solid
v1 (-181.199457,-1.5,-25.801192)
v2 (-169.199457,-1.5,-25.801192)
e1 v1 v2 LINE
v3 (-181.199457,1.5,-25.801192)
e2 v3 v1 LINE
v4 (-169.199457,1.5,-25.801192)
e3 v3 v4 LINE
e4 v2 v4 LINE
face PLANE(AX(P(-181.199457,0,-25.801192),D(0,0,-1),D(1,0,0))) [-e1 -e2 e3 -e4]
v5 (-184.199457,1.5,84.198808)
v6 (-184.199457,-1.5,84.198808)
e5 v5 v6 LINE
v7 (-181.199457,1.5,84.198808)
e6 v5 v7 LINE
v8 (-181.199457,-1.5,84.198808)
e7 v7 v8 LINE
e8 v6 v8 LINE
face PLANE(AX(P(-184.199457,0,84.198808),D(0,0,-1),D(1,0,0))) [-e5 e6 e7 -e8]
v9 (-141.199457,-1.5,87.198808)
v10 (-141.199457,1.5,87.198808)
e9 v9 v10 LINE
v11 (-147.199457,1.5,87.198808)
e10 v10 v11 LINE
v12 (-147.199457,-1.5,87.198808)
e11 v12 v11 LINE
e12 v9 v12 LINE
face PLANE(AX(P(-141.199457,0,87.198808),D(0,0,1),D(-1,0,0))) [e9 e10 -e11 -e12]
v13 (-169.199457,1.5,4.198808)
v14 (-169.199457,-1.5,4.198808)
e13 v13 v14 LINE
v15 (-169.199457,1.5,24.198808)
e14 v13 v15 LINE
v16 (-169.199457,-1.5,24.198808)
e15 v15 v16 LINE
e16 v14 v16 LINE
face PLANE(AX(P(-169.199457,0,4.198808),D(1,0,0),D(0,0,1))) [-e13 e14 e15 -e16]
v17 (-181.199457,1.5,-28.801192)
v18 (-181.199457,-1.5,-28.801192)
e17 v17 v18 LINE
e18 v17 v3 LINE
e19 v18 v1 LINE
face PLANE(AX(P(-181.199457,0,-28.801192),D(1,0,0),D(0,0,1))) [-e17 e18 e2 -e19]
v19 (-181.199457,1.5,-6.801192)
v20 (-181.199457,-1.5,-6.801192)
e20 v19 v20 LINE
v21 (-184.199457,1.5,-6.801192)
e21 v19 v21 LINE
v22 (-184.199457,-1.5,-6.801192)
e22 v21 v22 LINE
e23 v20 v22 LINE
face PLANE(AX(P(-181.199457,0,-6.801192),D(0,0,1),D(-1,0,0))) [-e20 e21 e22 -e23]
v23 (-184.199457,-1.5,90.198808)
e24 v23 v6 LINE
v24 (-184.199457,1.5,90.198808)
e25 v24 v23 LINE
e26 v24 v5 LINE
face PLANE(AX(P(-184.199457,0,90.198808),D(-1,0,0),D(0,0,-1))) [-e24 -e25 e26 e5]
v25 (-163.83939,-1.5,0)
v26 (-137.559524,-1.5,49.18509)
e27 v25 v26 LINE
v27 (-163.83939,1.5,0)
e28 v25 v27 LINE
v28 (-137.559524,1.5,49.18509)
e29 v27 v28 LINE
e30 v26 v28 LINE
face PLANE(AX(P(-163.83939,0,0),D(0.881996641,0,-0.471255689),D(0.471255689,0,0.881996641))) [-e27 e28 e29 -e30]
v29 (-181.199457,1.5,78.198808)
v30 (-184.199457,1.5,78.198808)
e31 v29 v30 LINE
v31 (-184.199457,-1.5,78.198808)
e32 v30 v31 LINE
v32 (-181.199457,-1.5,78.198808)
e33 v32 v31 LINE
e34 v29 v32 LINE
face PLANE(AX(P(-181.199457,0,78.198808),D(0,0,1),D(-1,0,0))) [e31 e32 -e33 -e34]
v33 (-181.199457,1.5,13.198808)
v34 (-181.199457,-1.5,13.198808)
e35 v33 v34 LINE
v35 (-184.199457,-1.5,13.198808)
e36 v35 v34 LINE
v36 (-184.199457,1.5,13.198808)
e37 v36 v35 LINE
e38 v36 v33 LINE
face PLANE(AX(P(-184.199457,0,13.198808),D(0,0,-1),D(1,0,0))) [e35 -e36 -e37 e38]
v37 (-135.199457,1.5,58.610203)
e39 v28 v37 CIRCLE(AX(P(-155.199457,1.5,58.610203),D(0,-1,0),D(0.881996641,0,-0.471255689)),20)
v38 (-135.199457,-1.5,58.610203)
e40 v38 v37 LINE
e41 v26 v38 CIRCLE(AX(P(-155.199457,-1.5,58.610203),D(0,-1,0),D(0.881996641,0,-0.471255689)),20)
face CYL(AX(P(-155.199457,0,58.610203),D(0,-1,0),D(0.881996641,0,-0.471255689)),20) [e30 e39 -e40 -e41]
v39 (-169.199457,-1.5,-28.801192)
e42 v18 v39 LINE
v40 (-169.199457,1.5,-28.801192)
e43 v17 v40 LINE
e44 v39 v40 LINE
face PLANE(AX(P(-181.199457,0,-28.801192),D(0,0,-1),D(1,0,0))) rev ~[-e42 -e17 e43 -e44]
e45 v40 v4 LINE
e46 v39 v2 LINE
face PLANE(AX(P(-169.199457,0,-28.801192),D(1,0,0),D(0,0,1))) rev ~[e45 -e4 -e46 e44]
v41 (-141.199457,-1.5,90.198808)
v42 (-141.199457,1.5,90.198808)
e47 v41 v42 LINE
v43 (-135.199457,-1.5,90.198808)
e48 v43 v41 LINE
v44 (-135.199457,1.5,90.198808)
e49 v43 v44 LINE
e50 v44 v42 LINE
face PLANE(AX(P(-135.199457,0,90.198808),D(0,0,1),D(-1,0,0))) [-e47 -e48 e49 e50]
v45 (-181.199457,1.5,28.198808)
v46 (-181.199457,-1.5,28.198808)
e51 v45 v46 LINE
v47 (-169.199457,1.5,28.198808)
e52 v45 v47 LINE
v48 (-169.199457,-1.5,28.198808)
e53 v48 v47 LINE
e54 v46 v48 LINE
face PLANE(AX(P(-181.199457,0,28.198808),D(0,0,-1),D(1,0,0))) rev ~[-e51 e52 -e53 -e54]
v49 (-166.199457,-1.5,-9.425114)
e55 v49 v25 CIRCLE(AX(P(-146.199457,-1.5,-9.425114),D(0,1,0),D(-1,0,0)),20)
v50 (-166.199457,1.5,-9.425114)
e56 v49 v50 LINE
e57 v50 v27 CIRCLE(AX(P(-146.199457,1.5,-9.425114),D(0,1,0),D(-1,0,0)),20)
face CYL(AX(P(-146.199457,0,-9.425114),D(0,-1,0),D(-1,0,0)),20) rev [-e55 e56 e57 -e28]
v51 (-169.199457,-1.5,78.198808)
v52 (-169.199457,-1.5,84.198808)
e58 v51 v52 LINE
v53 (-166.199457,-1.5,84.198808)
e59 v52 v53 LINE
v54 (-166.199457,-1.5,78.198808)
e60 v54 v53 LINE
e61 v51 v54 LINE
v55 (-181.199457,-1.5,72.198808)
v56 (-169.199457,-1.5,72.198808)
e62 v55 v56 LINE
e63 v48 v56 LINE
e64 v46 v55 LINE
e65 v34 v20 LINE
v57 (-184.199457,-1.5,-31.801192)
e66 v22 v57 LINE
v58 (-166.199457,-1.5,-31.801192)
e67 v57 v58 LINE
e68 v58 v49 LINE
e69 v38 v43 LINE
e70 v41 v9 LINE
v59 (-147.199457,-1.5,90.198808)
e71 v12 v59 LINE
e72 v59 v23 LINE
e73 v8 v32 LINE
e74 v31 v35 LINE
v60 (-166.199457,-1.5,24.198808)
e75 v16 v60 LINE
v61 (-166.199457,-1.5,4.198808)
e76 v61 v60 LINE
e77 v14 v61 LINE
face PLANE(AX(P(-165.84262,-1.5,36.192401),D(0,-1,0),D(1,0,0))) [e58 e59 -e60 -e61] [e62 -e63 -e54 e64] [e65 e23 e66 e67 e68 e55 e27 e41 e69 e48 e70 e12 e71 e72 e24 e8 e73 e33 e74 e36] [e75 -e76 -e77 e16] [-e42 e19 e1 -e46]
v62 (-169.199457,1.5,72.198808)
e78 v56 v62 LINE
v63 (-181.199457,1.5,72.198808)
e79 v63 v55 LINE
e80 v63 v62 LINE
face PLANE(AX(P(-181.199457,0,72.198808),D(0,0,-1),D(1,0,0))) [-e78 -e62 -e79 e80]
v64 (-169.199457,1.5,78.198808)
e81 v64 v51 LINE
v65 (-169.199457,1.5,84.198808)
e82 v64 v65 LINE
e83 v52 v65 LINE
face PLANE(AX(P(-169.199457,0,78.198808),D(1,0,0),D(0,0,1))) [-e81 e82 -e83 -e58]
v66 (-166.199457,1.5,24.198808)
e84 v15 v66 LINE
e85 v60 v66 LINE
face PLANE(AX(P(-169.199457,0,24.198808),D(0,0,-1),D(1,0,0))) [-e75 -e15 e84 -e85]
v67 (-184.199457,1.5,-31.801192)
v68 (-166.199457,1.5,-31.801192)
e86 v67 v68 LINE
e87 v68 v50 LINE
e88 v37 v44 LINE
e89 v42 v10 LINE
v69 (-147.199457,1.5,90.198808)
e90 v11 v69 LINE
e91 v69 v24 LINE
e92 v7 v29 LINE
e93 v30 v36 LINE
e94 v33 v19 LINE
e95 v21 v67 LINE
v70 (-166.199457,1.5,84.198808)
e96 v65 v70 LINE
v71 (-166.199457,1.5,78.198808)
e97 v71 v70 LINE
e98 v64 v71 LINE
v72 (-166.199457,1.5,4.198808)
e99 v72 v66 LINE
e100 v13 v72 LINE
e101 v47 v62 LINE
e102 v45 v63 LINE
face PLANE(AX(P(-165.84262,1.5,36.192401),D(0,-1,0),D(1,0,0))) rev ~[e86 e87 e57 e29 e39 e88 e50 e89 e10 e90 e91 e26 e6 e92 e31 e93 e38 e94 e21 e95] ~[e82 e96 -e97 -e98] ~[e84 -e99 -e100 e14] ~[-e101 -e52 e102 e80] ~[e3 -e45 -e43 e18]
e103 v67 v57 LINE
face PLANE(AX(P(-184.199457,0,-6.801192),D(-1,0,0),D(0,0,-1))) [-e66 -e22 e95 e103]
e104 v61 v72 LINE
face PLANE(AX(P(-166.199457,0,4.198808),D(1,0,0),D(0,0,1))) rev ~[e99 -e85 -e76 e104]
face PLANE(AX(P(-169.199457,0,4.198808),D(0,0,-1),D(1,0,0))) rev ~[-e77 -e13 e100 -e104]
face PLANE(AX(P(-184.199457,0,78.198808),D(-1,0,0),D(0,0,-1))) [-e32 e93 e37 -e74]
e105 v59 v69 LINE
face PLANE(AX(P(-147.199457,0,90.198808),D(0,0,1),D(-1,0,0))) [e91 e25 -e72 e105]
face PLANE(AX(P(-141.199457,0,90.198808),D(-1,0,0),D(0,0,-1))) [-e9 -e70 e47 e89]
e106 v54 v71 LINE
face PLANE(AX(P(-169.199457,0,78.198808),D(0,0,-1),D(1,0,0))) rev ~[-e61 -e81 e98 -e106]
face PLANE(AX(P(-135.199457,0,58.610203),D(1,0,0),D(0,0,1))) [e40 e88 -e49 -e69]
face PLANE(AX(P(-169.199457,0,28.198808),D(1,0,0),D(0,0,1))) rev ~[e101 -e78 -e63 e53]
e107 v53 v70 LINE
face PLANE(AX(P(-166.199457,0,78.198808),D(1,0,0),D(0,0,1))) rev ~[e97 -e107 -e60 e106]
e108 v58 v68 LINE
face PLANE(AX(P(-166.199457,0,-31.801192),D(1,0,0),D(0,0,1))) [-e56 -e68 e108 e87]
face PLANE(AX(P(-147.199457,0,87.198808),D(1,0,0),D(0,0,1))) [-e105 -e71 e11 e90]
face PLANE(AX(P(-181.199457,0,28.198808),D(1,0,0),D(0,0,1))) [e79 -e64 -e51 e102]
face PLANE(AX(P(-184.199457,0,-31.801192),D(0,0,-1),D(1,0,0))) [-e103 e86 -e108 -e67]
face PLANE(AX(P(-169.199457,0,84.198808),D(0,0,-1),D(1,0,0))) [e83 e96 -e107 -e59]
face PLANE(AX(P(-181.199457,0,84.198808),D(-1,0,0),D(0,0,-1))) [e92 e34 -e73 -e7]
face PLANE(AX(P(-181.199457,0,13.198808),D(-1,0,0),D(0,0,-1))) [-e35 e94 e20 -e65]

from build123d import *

# Parameters (mm, degrees)
F0_W     = 12
F0_H     = 3
F0_W_2   = 3
F0_H_2   = 20
F0_H_3   = 44
F0_H_4   = 6
F1_DEPTH = 1.5
F3_DEPTH = 1.5


# Not quite as in the source:
# - a feature of the source that left no trace in its solid (it failed there, or was rolled back) is left out


with BuildPart() as f1:
    # F0 (on Front) → F1 (new body, symmetric)
    with BuildSketch(Plane.XZ):
        with BuildLine():
            Line((-147.1994572369, 90.198807884), (-184.1994572369, 90.198807884))
            Line((-184.1994572369, 90.198807884), (-184.1994572369, 84.198807884))
            Line((-184.1994572369, 84.198807884), (-181.1994572369, 84.198807884))
            Line((-181.1994572369, 84.198807884), (-181.1994572369, 78.198807884))
            Line((-181.1994572369, 78.198807884), (-184.1994572369, 78.198807884))
            Line((-184.1994572369, 78.198807884), (-184.1994572369, 13.198807884))
            Line((-184.1994572369, 13.198807884), (-181.1994572369, 13.198807884))
            Line((-181.1994572369, 13.198807884), (-181.1994572369, -6.801192116))
            Line((-181.1994572369, -6.801192116), (-184.1994572369, -6.801192116))
            Line((-184.1994572369, -6.801192116), (-184.1994572369, -31.801192116))
            Line((-184.1994572369, -31.801192116), (-166.1994572369, -31.801192116))
            Line((-166.1994572369, -31.801192116), (-166.1994572369, -9.4251137796))
            ThreePointArc((-166.1994572369, -9.4251137796), (-165.6004708263, -4.5670615257), (-163.8393900667, 0))
            Line((-163.8393900667, 0), (-137.559524407, 49.1850895229))
            ThreePointArc((-137.559524407, 49.1850895229), (-135.7984436474, 53.7521510486), (-135.1994572369, 58.6102033025))
            Line((-135.1994572369, 58.6102033025), (-135.1994572369, 90.198807884))
            Line((-135.1994572369, 90.198807884), (-141.1994572369, 90.198807884))
            Line((-141.1994572369, 90.198807884), (-141.1994572369, 87.198807884))
            Line((-141.1994572369, 87.198807884), (-147.1994572369, 87.198807884))
            Line((-147.1994572369, 87.198807884), (-147.1994572369, 90.198807884))
        make_face()
        with Locations((-175.1994572369, -27.301192116)):
            Rectangle(F0_W, F0_H, mode=Mode.SUBTRACT)
        with Locations((-167.6994572369, 14.198807884)):
            Rectangle(F0_W_2, F0_H_2, mode=Mode.SUBTRACT)
        with Locations((-175.1994572369, 50.198807884)):
            Rectangle(F0_W, F0_H_3, mode=Mode.SUBTRACT)
        with Locations((-167.6994572369, 81.198807884)):
            Rectangle(F0_W_2, F0_H_4, mode=Mode.SUBTRACT)
    extrude(amount=F1_DEPTH, both=True)

    # F0 (on Front) → F3 (cut, symmetric)
    with BuildSketch(Plane.XZ):
        with Locations((-175.1994572369, -27.301192116)):
            Rectangle(F0_W, F0_H)
    extrude(amount=F3_DEPTH, both=True, mode=Mode.SUBTRACT)


solid = f1.part
